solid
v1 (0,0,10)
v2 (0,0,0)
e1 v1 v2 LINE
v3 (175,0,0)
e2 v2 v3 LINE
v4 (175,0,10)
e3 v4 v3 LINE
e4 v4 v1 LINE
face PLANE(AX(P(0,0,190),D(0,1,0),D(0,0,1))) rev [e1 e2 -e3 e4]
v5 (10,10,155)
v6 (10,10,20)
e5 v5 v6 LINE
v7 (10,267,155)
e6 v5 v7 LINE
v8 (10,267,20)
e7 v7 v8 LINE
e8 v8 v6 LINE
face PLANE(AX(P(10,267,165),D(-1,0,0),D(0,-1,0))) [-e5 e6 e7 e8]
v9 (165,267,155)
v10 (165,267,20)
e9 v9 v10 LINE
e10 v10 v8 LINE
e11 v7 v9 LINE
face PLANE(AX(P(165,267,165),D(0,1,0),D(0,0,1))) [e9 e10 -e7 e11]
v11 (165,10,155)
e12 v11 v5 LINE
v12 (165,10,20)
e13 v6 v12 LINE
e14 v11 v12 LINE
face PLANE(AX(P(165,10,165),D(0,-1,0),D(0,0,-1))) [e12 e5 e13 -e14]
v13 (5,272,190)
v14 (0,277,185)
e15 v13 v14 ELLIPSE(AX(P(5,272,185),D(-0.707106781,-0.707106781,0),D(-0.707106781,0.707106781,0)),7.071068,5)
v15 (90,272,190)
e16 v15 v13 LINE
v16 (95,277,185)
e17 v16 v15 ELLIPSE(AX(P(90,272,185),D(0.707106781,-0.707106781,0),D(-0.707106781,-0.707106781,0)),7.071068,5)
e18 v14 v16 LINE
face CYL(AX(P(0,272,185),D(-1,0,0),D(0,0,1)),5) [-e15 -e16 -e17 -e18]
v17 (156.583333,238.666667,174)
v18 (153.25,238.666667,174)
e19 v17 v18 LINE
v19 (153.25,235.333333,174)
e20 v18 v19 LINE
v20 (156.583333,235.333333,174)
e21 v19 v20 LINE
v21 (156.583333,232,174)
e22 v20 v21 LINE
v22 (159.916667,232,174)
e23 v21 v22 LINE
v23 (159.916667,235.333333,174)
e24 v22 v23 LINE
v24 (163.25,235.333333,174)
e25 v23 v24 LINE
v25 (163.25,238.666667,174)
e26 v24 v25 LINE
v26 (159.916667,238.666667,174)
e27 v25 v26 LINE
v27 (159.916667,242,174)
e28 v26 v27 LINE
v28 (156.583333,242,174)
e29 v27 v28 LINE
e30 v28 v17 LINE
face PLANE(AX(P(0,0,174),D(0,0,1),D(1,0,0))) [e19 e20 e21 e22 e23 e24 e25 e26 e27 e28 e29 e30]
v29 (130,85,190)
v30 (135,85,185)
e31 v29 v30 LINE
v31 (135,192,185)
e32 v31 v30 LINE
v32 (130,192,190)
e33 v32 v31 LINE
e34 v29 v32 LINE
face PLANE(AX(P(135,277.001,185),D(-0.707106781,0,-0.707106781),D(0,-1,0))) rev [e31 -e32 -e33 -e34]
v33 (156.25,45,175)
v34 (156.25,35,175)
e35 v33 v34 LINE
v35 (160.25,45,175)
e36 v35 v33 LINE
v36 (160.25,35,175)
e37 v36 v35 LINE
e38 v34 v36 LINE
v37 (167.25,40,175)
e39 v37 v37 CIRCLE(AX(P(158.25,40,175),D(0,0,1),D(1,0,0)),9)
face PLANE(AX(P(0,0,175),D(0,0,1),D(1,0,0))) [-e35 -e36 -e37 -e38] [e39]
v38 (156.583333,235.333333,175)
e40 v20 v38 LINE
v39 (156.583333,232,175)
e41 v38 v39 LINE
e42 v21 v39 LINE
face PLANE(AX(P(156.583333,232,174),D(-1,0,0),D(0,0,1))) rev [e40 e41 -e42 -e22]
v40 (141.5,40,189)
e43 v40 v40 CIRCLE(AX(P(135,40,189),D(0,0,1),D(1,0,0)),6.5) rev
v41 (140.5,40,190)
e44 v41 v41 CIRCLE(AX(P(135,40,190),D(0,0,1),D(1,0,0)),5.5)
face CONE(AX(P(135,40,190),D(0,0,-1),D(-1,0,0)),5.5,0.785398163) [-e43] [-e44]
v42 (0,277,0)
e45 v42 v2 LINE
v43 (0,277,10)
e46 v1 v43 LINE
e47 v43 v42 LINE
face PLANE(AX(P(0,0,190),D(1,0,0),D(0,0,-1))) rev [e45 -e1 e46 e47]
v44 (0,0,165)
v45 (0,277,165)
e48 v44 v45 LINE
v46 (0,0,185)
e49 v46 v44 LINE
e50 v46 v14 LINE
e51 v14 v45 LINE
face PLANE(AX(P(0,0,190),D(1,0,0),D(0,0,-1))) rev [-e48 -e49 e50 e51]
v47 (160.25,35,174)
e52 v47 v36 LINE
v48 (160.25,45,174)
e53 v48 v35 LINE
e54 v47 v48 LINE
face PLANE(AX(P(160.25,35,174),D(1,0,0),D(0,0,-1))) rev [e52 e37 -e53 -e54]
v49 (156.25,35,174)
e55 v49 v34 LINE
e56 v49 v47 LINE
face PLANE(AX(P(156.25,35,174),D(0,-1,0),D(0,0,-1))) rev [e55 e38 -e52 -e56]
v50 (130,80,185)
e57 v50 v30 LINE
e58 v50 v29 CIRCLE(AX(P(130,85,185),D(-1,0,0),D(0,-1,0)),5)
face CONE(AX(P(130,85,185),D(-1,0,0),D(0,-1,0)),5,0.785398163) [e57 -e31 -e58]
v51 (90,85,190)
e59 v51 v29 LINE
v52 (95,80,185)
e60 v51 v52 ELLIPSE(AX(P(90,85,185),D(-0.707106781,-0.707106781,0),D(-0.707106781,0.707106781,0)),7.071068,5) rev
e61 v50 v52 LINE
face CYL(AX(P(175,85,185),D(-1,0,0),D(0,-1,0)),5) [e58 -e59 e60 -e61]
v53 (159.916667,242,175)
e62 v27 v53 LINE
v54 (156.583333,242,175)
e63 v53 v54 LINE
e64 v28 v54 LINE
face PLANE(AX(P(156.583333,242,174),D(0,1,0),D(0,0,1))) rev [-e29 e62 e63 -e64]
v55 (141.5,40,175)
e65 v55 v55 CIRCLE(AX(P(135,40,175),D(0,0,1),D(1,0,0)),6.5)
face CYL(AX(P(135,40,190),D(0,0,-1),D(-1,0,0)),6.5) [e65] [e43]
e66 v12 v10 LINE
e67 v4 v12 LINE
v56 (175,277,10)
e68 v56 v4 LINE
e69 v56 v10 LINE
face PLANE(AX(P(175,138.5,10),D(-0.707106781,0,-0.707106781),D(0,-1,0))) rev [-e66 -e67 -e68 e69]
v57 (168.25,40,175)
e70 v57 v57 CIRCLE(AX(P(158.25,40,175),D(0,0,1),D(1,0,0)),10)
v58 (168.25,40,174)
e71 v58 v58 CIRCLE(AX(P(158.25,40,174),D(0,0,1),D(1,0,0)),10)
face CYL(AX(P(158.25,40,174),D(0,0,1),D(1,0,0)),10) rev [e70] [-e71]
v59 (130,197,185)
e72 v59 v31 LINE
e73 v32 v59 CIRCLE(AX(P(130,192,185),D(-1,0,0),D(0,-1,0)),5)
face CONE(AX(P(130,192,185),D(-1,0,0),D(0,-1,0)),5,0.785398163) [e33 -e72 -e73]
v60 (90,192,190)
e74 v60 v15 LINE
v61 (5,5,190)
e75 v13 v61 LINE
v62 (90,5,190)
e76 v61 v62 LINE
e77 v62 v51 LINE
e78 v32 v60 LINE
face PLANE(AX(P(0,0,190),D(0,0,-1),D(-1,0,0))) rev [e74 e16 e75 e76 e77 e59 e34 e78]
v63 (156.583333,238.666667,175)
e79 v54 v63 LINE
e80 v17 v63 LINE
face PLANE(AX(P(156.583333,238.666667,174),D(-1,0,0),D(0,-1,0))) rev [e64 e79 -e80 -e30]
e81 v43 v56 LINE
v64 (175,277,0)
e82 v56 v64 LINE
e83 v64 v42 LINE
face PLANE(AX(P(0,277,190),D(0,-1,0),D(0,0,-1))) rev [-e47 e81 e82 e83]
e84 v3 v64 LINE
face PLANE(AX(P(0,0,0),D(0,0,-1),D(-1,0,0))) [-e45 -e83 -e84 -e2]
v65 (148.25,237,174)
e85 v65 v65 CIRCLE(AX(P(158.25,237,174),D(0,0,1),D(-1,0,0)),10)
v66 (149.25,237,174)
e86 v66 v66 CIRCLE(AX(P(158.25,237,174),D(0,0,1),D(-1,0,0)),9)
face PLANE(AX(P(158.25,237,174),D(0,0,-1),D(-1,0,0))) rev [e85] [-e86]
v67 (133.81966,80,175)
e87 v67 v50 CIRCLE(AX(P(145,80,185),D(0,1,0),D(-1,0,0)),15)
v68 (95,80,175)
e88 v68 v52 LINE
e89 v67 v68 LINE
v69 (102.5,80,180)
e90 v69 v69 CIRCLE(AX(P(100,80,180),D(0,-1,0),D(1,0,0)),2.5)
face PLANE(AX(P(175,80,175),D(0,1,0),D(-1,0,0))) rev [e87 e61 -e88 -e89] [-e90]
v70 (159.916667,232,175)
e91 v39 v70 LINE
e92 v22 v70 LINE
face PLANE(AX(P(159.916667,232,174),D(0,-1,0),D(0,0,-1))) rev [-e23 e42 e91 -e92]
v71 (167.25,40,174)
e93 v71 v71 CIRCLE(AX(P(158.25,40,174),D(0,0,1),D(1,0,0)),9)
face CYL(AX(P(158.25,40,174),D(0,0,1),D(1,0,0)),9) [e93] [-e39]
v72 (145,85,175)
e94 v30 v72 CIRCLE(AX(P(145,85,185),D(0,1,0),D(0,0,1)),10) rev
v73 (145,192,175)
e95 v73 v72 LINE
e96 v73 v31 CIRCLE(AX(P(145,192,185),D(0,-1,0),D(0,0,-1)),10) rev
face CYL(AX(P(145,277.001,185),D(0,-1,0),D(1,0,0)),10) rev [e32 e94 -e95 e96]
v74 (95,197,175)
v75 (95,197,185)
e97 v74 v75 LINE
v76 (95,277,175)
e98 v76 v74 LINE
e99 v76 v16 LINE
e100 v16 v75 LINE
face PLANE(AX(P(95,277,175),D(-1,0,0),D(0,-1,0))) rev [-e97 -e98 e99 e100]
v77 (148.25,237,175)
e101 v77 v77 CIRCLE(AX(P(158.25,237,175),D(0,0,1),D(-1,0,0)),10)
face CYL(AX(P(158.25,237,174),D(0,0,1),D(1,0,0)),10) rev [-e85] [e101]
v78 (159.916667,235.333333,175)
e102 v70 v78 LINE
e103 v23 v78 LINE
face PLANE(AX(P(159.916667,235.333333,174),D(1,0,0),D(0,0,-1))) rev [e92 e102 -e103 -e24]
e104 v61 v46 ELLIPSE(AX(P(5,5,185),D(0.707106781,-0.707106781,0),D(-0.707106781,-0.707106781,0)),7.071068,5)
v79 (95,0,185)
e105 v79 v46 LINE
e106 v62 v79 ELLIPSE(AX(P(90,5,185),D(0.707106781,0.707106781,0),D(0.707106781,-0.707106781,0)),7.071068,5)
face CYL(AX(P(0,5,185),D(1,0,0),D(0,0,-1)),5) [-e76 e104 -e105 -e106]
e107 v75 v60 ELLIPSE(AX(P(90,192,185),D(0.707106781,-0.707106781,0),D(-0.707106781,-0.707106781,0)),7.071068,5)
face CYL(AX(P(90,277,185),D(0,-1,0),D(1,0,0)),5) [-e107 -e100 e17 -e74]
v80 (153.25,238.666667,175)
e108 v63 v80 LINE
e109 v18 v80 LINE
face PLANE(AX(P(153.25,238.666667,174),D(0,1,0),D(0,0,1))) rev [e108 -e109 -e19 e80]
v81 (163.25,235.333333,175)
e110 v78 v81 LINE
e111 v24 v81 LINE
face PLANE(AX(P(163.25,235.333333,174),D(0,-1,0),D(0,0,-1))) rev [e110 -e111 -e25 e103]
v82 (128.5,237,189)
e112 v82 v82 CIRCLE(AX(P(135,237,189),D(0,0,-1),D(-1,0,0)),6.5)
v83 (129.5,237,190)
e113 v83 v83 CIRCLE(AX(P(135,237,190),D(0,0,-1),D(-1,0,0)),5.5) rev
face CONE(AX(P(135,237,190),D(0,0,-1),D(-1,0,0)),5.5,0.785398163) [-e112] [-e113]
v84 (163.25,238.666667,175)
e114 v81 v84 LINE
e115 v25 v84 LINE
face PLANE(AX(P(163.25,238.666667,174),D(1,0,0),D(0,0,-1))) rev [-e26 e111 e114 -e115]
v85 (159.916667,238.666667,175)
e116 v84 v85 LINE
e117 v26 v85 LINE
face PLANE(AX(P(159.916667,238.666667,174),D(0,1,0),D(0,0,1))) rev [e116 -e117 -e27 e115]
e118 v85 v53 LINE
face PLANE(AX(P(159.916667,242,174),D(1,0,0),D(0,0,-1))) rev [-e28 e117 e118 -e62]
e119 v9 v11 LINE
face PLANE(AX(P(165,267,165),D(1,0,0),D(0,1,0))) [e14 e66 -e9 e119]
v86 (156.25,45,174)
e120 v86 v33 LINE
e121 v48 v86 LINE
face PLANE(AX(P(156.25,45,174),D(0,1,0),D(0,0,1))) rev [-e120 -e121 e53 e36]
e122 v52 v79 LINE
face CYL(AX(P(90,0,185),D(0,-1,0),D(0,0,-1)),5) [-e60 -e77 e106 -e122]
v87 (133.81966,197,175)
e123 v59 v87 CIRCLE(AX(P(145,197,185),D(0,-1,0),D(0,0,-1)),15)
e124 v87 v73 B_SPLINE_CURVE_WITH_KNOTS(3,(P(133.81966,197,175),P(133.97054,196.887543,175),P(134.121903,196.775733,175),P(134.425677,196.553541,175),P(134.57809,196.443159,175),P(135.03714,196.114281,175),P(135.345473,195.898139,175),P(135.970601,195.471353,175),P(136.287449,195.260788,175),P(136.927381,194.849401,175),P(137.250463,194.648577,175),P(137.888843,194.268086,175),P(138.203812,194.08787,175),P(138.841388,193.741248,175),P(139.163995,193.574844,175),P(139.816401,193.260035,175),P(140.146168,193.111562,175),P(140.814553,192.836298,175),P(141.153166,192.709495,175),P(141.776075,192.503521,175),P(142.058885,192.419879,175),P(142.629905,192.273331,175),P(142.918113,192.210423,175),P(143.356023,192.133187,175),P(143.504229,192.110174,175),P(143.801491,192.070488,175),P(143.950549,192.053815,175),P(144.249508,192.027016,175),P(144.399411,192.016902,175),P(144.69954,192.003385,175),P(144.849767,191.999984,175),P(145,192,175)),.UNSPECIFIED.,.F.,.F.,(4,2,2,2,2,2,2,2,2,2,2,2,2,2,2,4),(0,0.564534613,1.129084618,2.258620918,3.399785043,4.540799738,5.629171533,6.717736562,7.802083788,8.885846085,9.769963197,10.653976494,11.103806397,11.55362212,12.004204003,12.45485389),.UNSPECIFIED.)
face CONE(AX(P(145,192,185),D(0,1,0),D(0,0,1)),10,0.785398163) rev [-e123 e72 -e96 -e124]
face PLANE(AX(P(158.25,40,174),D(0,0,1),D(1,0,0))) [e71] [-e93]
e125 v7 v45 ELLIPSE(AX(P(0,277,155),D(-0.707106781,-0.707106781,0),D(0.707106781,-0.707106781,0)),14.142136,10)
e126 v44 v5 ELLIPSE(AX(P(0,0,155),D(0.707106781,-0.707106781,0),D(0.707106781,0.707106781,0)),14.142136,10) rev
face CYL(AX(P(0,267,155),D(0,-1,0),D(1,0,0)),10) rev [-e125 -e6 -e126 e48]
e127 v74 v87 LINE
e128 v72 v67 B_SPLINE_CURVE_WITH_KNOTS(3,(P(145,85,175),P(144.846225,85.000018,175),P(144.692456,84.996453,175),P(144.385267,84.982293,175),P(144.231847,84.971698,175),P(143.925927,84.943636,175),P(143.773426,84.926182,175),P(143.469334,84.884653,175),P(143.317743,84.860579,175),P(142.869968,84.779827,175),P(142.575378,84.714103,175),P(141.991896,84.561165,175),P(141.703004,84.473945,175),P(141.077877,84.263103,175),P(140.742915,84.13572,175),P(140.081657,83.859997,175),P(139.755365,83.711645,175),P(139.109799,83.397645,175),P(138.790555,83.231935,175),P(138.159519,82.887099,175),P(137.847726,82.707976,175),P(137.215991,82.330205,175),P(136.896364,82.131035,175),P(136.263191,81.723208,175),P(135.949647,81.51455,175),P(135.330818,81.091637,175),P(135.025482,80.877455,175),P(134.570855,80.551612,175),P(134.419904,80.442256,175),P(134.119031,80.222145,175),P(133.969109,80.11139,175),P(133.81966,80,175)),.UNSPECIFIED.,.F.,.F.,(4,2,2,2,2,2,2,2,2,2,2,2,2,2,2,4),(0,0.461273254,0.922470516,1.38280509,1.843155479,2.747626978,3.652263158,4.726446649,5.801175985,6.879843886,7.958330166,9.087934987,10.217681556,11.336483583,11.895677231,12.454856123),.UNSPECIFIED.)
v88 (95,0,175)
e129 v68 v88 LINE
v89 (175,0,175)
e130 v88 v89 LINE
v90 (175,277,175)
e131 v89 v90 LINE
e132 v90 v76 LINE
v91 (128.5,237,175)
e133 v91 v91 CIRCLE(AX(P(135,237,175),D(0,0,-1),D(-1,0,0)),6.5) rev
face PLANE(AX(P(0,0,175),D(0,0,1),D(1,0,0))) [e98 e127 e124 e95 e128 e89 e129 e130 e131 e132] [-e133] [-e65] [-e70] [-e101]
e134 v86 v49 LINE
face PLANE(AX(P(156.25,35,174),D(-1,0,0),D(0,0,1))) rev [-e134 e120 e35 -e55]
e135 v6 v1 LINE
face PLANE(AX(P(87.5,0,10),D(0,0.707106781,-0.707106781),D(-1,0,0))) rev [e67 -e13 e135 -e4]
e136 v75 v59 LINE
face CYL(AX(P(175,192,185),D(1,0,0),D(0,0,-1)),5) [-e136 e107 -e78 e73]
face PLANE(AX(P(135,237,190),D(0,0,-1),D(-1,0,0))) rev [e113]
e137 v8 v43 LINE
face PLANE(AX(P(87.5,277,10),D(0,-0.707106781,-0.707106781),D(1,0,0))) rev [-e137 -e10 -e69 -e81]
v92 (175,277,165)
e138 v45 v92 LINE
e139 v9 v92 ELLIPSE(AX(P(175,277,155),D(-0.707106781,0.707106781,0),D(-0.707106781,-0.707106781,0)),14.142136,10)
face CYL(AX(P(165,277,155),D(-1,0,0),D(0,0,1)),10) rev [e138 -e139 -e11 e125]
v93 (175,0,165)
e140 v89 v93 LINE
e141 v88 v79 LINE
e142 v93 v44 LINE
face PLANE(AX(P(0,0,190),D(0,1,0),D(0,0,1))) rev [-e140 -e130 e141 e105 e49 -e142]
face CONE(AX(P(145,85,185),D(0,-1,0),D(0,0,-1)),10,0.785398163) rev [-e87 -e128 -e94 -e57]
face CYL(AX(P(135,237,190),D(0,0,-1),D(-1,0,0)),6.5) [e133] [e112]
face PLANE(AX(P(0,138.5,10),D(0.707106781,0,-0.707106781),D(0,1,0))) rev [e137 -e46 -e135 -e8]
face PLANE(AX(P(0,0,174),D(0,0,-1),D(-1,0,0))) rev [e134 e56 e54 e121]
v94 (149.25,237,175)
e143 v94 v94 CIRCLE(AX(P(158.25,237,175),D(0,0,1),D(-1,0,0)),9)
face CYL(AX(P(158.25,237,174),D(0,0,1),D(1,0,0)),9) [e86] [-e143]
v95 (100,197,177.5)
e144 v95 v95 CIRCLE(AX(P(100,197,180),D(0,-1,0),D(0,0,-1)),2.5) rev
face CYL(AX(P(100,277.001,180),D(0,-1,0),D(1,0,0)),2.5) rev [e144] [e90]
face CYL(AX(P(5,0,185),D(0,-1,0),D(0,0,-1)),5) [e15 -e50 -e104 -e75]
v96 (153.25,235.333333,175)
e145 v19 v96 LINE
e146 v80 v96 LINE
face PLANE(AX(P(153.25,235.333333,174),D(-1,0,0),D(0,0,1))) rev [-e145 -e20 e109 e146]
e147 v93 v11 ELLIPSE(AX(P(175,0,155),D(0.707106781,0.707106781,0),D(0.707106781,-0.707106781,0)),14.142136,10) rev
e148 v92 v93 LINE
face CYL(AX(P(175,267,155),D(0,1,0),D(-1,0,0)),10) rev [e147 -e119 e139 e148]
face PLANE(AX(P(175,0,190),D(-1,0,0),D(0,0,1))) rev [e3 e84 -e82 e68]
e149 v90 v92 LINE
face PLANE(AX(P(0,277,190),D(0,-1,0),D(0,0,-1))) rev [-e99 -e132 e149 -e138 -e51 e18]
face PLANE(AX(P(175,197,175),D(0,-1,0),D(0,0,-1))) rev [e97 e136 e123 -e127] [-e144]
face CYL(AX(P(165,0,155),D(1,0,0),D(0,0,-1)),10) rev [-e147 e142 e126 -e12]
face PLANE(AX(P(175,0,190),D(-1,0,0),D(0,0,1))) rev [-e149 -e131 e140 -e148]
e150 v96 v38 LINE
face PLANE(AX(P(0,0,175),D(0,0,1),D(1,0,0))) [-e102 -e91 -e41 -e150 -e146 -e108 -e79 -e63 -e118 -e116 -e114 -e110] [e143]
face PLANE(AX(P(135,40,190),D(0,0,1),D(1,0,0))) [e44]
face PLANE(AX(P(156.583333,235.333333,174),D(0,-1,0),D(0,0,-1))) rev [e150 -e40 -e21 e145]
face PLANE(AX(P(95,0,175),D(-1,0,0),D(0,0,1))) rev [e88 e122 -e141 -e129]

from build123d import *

# Parameters (mm, degrees)
ESQUISSE1_W              = 175
ESQUISSE1_H              = 277
BOSS_EXTRU_2_DEPTH       = 190
ESQUISSE2_W              = 80
ESQUISSE2_H              = 80
ENL_V_MAT_EXTRU_2_DEPTH  = 15
ESQUISSE6_R              = 6.5
BOSS_EXTRU_4_DEPTH       = 15
CHANFREIN2_SIZE          = 1
ENL_V_START              = -10
ESQUISSE12_OUTSIDE_W     = 252.75
ESQUISSE12_OUTSIDE_H     = 354.75
ESQUISSE12_OUTSIDE_W_2   = 155
ESQUISSE12_OUTSIDE_H_2   = 257
ENL_V_MAT_EXTRU_5_DEPTH  = 155
CHANFREIN5_SIZE          = 10
CONG_1_R                 = 5
ENL_V_MAT_EXTRU_10_REACH = 326.86
ESQUISSE13_R             = 2.5
CHANFREIN8_SIZE          = 5
CONG_3_R                 = 10
ESQUISSE14_R             = 10
ESQUISSE14_R_2           = 9
ENL_V_MAT_EXTRU_11_DEPTH = 1
ESQUISSE15_W             = 4
ESQUISSE15_H             = 10
ENL_V_MAT_EXTRU_12_DEPTH = 1


with BuildPart() as part:
    # Esquisse1 → Boss.-Extru.2 (new body)
    with BuildSketch(Plane.XY):
        with Locations((87.5, 138.5)):
            Rectangle(ESQUISSE1_W, ESQUISSE1_H)
    extrude(amount=BOSS_EXTRU_2_DEPTH)

    # Esquisse2 → Enlèv. mat.-Extru.2 (cut)
    with BuildSketch(Plane.XY.offset(190)):
        with Locations((135, 40)):
            Rectangle(ESQUISSE2_W, ESQUISSE2_H)
        with Locations((135, 237)):
            Rectangle(ESQUISSE2_W, ESQUISSE2_H)
    extrude(amount=-ENL_V_MAT_EXTRU_2_DEPTH, mode=Mode.SUBTRACT)

    # Esquisse6 → Boss.-Extru.4 (add)
    with BuildSketch(Plane.XY.offset(175)):
        with Locations((135, 40)):
            Circle(ESQUISSE6_R)
        with Locations(Location((135, 237, 0), (0, 0, 180))):
            Circle(ESQUISSE6_R)
    extrude(amount=BOSS_EXTRU_4_DEPTH)

    # Chanfrein2
    chanfrein2_edges = [part.edges().sort_by_distance(p)[0] for p in [
        (128.5, 40, 190),
        (141.5, 237, 190),
    ]]
    chamfer(chanfrein2_edges, length=CHANFREIN2_SIZE)

    # Esquisse12 outside → Enlèv. mat.-Extru.5 (cut)
    with BuildSketch(Plane(origin=(0, 0, 0), x_dir=(-1, 0, 0), z_dir=(0, 0, -1)).offset(ENL_V_START)):
        with Locations((-87.5, 138.5)):
            Rectangle(ESQUISSE12_OUTSIDE_W, ESQUISSE12_OUTSIDE_H)
        with Locations((-87.5, 138.5)):
            Rectangle(ESQUISSE12_OUTSIDE_W_2, ESQUISSE12_OUTSIDE_H_2, mode=Mode.SUBTRACT)
    extrude(amount=-ENL_V_MAT_EXTRU_5_DEPTH, mode=Mode.SUBTRACT)

    # Chanfrein5
    chanfrein5_edges = [part.edges().sort_by_distance(p)[0] for p in [
        (165, 138.5, 10),
        (87.5, 267, 10),
        (10, 138.5, 10),
        (87.5, 10, 10),
    ]]
    chamfer(chanfrein5_edges, length=CHANFREIN5_SIZE - 0.0001)  # a hair under: the kernel refuses the full size

    # Congé1
    cong_1_edges = [part.edges().sort_by_distance(p)[0] for p in [
        (175, 138.5, 190),
        (135, 80, 190),
        (95, 40, 190),
        (47.5, 277, 190),
        (95, 237, 190),
        (135, 197, 190),
        (0, 138.5, 190),
        (47.5, 0, 190),
    ]]
    fillet(cong_1_edges, radius=CONG_1_R)

    # Esquisse13 → Enlèv. mat.-Extru.10 (cut, up to next)
    with BuildSketch(Plane.XZ.offset(-80), mode=Mode.PRIVATE) as enl_v_mat_extru_10_sk1:
        with Locations((100, 180)):
            Circle(ESQUISSE13_R)
    enl_v_mat_extru_10_tool1 = extrude(enl_v_mat_extru_10_sk1.sketch, amount=-ENL_V_MAT_EXTRU_10_REACH, mode=Mode.PRIVATE) & part.part
    # Esquisse13 → Enlèv. mat.-Extru.10 (cut, up to next)
    with BuildSketch(Plane.XZ.offset(-80), mode=Mode.PRIVATE) as enl_v_mat_extru_10_sk2:
        with BuildLine():
            Line((145, 175), (175, 175))
            Line((175, 175), (175, 190))
            Line((175, 190), (135, 190))
            Line((135, 190), (135, 185))
            ThreePointArc((135, 185), (137.928932188, 177.928932188), (145, 175))
        make_face()
    enl_v_mat_extru_10_tool2 = extrude(enl_v_mat_extru_10_sk2.sketch, amount=-ENL_V_MAT_EXTRU_10_REACH, mode=Mode.PRIVATE) & part.part
    add(enl_v_mat_extru_10_tool1.solids().sort_by_distance((100, 80, 180))[0], mode=Mode.SUBTRACT)
    add(enl_v_mat_extru_10_tool2.solids().sort_by_distance((155.659019, 80, 182.695347))[0], mode=Mode.SUBTRACT)

    # Chanfrein8
    chanfrein8_edges = [part.edges().sort_by_distance(p)[0] for p in [
        (135, 81.464466094, 188.535533906),
        (137.928932188, 80, 177.928932188),
        (137.928932188, 197, 177.928932188),
        (135, 195.535533906, 188.535533906),
        (135, 138.5, 190),
    ]]
    chamfer(chanfrein8_edges, length=CHANFREIN8_SIZE - 0.0001)  # a hair under: the kernel refuses the full size

    # Congé3
    cong_3_edges = [part.edges().sort_by_distance(p)[0] for p in [
        (87.5, 267, 165),
        (165, 138.5, 165),
        (87.5, 10, 165),
        (10, 138.5, 165),
    ]]
    fillet(cong_3_edges, radius=CONG_3_R - 0.0001)  # a hair under: the kernel refuses the full size

    # Esquisse14 → Enlèv. mat.-Extru.11 (cut)
    # profile 1 of 2: a face of its own
    with BuildSketch(Plane.XY.offset(175)):
        with Locations((158.25, 40)):
            Circle(ESQUISSE14_R)
        with Locations((158.25, 40)):
            Circle(ESQUISSE14_R_2, mode=Mode.SUBTRACT)
    # profile 2 of 2: a face of its own
    with BuildSketch(Plane.XY.offset(175)):
        with Locations(Location((158.25, 237, 0), (0, 0, 180))):
            Circle(ESQUISSE14_R)
        with Locations(Location((158.25, 237, 0), (0, 0, 180))):
            Circle(ESQUISSE14_R_2, mode=Mode.SUBTRACT)
    extrude(amount=-ENL_V_MAT_EXTRU_11_DEPTH, mode=Mode.SUBTRACT)

    # Esquisse15 → Enlèv. mat.-Extru.12 (cut)
    with BuildSketch(Plane.XY.offset(175)):
        with Locations((158.25, 40)):
            Rectangle(ESQUISSE15_W, ESQUISSE15_H)
        Polygon((156.583333333, 235.333333333), (153.25, 235.333333333), (153.25, 238.666666667), (156.583333333, 238.666666667), (156.583333333, 242), (159.916666667, 242), (159.916666667, 238.666666667), (163.25, 238.666666667), (163.25, 235.333333333), (159.916666667, 235.333333333), (159.916666667, 232), (156.583333333, 232), align=None)
    extrude(amount=-ENL_V_MAT_EXTRU_12_DEPTH, mode=Mode.SUBTRACT)


solid = part.part
